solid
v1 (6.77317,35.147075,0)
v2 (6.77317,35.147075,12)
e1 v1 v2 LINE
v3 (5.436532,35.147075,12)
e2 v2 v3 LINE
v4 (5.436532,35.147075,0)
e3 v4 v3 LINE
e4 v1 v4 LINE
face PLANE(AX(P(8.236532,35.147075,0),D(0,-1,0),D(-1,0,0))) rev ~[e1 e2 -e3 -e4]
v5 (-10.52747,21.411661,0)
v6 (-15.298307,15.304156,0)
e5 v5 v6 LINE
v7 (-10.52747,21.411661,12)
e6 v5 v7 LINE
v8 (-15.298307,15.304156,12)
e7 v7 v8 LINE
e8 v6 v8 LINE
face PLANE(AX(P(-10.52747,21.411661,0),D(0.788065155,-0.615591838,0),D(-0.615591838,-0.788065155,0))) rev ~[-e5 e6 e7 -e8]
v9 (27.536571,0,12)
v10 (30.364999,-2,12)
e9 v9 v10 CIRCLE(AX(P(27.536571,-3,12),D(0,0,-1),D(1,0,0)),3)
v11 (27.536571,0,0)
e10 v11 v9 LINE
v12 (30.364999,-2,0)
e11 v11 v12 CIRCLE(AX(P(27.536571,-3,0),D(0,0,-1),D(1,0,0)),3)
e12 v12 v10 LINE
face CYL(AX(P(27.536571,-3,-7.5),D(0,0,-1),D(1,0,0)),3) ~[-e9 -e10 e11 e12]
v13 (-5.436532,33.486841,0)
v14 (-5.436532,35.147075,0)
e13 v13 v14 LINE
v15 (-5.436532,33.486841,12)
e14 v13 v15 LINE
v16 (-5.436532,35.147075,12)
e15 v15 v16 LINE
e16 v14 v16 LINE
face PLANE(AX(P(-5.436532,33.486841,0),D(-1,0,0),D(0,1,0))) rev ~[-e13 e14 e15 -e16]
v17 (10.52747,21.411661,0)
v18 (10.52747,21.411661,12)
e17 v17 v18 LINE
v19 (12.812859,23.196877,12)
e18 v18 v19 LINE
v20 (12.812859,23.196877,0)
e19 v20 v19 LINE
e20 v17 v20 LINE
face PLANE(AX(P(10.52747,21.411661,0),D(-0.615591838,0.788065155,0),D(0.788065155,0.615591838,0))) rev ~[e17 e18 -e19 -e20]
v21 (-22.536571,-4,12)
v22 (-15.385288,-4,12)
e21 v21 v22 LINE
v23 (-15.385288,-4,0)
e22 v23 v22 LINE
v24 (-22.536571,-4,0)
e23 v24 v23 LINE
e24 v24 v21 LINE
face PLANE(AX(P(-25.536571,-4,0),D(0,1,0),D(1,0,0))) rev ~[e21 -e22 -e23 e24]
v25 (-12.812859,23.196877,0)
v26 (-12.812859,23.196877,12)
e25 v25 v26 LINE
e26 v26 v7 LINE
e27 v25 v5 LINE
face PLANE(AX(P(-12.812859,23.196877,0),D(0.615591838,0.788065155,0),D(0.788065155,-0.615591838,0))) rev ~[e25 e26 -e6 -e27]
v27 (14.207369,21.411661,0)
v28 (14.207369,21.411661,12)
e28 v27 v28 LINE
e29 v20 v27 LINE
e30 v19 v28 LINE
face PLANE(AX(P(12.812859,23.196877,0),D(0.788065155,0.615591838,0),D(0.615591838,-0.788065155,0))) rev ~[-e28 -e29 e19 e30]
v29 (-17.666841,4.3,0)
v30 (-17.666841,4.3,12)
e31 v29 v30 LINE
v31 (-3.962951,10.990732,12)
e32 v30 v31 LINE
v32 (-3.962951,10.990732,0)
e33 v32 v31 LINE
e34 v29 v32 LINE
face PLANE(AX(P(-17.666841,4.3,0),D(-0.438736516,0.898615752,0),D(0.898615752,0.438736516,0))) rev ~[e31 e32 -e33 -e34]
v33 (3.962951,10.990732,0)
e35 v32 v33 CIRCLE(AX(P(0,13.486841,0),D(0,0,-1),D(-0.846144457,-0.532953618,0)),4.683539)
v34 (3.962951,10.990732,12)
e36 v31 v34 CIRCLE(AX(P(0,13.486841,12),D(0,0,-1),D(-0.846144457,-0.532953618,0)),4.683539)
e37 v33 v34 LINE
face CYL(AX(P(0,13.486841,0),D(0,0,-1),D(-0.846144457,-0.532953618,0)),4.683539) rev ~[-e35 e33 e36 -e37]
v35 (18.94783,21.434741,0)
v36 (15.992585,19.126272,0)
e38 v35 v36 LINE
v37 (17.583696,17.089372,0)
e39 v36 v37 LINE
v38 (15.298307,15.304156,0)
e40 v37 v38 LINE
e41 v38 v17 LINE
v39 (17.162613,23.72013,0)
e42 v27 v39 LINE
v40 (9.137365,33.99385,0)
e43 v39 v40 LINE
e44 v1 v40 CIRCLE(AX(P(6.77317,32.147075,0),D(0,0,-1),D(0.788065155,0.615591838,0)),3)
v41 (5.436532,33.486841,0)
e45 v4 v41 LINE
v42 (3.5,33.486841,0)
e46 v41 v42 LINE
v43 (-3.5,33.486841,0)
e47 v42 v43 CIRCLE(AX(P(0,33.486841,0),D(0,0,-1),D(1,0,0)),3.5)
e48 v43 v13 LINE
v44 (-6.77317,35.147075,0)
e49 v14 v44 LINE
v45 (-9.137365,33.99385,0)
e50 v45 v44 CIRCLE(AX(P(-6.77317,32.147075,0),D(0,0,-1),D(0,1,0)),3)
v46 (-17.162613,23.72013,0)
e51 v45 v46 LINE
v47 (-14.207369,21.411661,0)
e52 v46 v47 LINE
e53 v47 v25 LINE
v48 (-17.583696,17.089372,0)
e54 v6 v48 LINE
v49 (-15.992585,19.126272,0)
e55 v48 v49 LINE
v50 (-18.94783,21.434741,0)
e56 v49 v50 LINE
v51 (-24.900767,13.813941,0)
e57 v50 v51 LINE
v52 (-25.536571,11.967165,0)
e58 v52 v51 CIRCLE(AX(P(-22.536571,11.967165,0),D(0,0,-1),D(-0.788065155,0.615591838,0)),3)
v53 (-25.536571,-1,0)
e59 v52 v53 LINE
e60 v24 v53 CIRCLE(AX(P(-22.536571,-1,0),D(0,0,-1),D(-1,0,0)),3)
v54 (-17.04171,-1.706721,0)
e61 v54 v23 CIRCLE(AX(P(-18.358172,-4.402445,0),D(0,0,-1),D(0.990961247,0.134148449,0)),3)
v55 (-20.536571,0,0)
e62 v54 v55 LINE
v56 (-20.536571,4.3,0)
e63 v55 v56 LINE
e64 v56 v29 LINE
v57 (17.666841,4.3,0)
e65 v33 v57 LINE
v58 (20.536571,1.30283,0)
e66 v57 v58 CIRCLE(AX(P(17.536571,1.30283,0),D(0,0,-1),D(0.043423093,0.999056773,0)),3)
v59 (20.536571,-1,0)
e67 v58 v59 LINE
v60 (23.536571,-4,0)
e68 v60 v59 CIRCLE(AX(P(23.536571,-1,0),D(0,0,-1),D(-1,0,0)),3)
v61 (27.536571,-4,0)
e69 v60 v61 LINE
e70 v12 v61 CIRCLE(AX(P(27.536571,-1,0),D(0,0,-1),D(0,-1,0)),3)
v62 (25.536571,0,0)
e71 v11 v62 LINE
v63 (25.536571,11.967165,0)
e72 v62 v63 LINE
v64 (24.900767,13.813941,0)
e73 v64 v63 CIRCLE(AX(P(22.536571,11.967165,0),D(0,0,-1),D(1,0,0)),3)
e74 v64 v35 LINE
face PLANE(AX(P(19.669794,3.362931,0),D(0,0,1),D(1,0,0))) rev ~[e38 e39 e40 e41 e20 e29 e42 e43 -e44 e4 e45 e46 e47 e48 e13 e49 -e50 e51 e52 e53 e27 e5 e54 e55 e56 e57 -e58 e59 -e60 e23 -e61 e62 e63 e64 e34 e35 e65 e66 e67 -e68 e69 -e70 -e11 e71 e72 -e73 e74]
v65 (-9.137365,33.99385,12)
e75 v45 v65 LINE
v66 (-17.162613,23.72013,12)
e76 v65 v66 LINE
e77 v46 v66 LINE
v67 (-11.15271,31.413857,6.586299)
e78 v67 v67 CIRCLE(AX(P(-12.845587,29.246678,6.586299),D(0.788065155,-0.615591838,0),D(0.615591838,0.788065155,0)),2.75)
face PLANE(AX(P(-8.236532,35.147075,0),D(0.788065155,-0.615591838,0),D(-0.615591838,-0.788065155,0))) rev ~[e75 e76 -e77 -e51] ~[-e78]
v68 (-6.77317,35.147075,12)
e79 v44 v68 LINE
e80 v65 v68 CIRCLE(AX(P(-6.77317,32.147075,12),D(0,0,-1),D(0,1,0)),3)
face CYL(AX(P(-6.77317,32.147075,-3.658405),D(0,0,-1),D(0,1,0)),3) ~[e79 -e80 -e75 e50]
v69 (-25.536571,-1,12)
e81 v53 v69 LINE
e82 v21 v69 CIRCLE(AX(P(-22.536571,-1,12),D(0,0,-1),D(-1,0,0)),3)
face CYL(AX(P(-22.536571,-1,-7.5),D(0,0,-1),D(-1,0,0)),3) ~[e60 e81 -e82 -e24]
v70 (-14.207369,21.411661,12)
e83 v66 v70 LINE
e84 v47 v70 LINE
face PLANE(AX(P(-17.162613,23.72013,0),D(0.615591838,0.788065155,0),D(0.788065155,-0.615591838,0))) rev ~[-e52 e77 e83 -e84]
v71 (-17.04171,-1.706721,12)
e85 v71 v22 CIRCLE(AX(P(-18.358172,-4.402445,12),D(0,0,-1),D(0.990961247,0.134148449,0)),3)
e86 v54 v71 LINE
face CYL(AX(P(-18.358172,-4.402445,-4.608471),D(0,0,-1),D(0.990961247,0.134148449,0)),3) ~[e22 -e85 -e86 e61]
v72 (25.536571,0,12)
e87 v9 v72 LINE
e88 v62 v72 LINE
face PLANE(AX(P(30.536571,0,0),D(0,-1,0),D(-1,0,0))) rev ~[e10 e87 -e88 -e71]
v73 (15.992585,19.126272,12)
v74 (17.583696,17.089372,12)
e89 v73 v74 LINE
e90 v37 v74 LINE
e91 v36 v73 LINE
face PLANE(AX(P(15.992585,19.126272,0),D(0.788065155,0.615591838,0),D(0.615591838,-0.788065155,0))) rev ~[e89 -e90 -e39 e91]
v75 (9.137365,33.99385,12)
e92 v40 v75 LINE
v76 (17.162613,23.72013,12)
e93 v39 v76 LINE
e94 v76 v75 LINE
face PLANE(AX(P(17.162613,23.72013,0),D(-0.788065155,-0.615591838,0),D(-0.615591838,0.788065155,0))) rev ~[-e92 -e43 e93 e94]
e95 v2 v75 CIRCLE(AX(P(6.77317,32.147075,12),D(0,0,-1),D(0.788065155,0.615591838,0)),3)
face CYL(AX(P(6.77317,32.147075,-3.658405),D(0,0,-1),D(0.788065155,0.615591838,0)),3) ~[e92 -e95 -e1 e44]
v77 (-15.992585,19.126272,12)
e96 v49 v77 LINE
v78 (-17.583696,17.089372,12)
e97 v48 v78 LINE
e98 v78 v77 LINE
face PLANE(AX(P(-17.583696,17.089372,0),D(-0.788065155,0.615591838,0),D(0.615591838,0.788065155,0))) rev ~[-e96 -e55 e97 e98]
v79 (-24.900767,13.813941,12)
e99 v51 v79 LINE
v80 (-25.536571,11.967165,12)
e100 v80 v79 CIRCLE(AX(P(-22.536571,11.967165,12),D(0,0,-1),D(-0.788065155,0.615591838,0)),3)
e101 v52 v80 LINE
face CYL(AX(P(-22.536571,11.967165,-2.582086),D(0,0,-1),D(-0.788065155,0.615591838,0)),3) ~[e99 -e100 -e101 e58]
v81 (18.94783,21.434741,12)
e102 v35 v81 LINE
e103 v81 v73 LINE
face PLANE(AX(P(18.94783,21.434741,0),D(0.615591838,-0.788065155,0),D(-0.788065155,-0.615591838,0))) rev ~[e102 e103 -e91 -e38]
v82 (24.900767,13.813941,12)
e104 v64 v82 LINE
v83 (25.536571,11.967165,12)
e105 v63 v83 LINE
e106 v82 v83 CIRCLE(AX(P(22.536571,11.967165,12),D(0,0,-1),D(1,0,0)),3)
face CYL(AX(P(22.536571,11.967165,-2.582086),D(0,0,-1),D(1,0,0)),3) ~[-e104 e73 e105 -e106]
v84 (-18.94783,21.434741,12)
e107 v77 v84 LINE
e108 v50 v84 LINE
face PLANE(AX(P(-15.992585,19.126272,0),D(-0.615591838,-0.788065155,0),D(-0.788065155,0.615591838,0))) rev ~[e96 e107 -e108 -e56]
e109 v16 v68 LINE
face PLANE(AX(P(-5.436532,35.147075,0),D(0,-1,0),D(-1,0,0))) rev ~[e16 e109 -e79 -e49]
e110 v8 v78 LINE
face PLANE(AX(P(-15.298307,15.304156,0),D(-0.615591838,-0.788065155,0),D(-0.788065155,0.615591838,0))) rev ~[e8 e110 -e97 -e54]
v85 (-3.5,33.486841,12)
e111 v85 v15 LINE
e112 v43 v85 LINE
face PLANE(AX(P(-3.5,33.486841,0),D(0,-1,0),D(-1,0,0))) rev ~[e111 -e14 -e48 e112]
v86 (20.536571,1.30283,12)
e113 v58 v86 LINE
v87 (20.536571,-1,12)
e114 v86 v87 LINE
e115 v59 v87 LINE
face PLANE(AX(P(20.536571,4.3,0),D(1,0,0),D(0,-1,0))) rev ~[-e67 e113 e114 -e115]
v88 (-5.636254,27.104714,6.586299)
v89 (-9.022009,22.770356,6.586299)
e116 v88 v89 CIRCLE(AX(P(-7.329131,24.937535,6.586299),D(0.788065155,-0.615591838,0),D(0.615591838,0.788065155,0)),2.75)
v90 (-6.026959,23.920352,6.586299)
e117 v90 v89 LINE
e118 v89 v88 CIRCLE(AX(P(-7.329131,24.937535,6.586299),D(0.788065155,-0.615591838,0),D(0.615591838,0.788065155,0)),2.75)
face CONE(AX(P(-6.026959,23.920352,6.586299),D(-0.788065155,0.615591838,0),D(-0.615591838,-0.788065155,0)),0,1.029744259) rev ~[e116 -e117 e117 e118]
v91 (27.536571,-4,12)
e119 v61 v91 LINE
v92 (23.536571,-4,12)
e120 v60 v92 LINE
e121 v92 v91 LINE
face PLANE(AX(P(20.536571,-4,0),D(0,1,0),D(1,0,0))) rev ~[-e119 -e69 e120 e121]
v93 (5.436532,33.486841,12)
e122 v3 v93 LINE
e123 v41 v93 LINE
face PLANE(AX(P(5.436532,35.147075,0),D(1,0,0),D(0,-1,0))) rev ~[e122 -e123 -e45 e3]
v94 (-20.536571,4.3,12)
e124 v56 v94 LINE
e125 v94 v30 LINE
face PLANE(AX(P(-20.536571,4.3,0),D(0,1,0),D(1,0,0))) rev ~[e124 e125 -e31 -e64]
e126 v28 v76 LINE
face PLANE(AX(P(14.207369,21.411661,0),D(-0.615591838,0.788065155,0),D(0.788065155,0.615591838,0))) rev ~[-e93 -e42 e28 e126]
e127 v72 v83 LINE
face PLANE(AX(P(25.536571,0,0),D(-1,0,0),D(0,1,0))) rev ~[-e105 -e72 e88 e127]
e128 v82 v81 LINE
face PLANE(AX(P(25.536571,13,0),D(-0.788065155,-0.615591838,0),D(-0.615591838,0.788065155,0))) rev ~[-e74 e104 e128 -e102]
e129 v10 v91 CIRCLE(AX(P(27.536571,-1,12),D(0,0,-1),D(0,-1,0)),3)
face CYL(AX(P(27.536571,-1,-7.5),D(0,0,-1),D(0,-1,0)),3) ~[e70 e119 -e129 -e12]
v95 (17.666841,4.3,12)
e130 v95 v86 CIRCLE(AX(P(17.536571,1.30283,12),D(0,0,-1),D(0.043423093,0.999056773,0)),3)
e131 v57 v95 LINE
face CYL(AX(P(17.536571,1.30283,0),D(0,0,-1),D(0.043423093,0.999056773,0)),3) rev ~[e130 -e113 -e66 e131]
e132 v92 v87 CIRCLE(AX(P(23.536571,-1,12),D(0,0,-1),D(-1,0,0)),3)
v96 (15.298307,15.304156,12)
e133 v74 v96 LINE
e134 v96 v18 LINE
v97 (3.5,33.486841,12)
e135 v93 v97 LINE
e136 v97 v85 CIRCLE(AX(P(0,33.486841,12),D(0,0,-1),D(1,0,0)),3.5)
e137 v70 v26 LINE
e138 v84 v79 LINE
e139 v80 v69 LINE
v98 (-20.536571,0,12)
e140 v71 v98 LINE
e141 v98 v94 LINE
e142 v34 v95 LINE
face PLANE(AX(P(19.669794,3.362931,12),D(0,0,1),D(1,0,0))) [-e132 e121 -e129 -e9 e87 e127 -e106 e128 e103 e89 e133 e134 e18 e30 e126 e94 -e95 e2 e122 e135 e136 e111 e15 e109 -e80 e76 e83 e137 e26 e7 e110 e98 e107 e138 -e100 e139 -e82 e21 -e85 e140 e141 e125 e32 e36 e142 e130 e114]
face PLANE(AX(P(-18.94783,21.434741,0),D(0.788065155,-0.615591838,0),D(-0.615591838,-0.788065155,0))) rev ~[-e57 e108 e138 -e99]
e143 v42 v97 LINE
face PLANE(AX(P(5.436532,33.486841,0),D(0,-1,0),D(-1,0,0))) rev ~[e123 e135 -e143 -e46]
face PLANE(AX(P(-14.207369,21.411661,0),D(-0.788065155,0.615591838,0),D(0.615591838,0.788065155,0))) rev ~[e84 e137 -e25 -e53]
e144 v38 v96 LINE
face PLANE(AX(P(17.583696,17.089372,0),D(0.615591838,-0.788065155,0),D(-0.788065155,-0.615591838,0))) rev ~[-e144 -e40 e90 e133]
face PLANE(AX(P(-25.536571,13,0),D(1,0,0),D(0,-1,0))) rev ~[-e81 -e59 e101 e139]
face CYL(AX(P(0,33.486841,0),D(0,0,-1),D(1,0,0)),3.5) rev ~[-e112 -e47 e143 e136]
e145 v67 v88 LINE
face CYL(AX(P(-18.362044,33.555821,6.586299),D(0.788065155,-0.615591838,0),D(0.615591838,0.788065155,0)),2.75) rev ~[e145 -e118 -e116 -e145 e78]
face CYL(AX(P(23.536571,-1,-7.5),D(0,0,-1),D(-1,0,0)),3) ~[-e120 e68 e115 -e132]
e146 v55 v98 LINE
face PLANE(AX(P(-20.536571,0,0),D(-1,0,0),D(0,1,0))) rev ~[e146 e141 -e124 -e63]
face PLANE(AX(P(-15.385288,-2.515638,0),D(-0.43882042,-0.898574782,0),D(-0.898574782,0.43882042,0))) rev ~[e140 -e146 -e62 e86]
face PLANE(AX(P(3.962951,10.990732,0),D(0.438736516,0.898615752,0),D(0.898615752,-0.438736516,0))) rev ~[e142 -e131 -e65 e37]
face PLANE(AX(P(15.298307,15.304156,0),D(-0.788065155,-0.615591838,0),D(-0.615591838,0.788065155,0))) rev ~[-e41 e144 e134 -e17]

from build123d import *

# Parameters (mm, degrees)
F1_DEPTH    = 12
F3_D        = 5.5
F3_DEPTH    = 7
F3_TIP      = 1.6523667023
F4_T1_DEPTH = 12
F4_T3_DEPTH = 27
F4_T5_DEPTH = 17.1641728771
F4_T7_DEPTH = 19.3168092608
F4_T9_DEPTH = 21.2169428411


# Not quite as in the source:
# - a fillet or chamfer that OpenCascade refuses, or shapes differently, is made with other operations: its cross-section is extruded or revolved along the edge and cut away or added
# - a feature names something its author has since deleted; it is built from what else it names


with BuildPart() as f1:
    # F0 (on Top) → F1 (new body)
    with BuildSketch(Plane.XY):
        with BuildLine():
            Line((5.4365318258, 35.1470746964), (5.4365318258, 33.4868409083))
            Line((5.4365318258, 33.4868409083), (3.5, 33.4868409083))
            ThreePointArc((3.5, 33.4868409083), (0, 29.9868409083), (-3.5, 33.4868409083))
            Line((-3.5, 33.4868409083), (-5.4365318258, 33.4868409083))
            Line((-5.4365318258, 33.4868409083), (-5.4365318258, 35.1470746964))
            Line((-5.4365318258, 35.1470746964), (-8.2365318258, 35.1470746964))
            Line((-8.2365318258, 35.1470746964), (-17.1626134825, 23.7201299491))
            Line((-17.1626134825, 23.7201299491), (-14.2073691514, 21.4116605551))
            Line((-14.2073691514, 21.4116605551), (-12.8128593238, 23.1968768865))
            Line((-12.8128593238, 23.1968768865), (-10.5274703744, 21.4116605551))
            Line((-10.5274703744, 21.4116605551), (-15.298307122, 15.304155604))
            Line((-15.298307122, 15.304155604), (-17.5836960714, 17.0893719354))
            Line((-17.5836960714, 17.0893719354), (-15.9925854827, 19.1262716057))
            Line((-15.9925854827, 19.1262716057), (-18.9478298139, 21.4347409997))
            Line((-18.9478298139, 21.4347409997), (-25.5365714751, 13))
            Line((-25.5365714751, 13), (-25.5365714751, 0))
            Line((-25.5365714751, 0), (-25.5365714751, -4))
            Line((-25.5365714751, -4), (-20.5365714751, -4))
            Line((-20.5365714751, -4), (-15.3852878138, -4))
            Line((-15.3852878138, -4), (-15.3852878138, -2.5156375486))
            Line((-15.3852878138, -2.5156375486), (-20.5365714751, 0))
            Line((-20.5365714751, 0), (-20.5365714751, 4.3))
            Line((-20.5365714751, 4.3), (-17.6668407531, 4.3))
            Line((-17.6668407531, 4.3), (-3.9629505379, 10.990731871))
            ThreePointArc((-3.9629505379, 10.990731871), (0, 18.1703798791), (3.9629505379, 10.990731871))
            Line((3.9629505379, 10.990731871), (17.6668407531, 4.3))
            Line((17.6668407531, 4.3), (20.5365714751, 4.3))
            Line((20.5365714751, 4.3), (20.5365714751, -4))
            Line((20.5365714751, -4), (30.5365714751, -4))
            Line((30.5365714751, -4), (30.5365714751, 0))
            Line((30.5365714751, 0), (25.5365714751, 0))
            Line((25.5365714751, 0), (25.5365714751, 13))
            Line((25.5365714751, 13), (18.9478298139, 21.4347409997))
            Line((18.9478298139, 21.4347409997), (15.9925854827, 19.1262716057))
            Line((15.9925854827, 19.1262716057), (17.5836960714, 17.0893719354))
            Line((17.5836960714, 17.0893719354), (15.298307122, 15.304155604))
            Line((15.298307122, 15.304155604), (10.5274703744, 21.4116605551))
            Line((10.5274703744, 21.4116605551), (12.8128593238, 23.1968768865))
            Line((12.8128593238, 23.1968768865), (14.2073691514, 21.4116605551))
            Line((14.2073691514, 21.4116605551), (17.1626134825, 23.7201299491))
            Line((17.1626134825, 23.7201299491), (8.2365318258, 35.1470746964))
            Line((8.2365318258, 35.1470746964), (5.4365318258, 35.1470746964))
        make_face()
    extrude(amount=F1_DEPTH)

    # F3
    with Locations(Plane(origin=(-22.1660473582, 17.3148600175, 0), x_dir=(-0.6155918384, -0.788065155, 0), z_dir=(-0.788065155, 0.6155918384, 0))):
        with Locations((-15.1406489313, 6.5862988122)):
            Hole(F3_D / 2, depth=F3_DEPTH)
            with Locations((0, 0, -(F3_DEPTH + F3_TIP / 2))):  # 118° drill point
                Cone(0, F3_D / 2, F3_TIP, mode=Mode.SUBTRACT)

    # F4: fillet of radius 3 on 10 edges, made by hand

    # F4_s2 → F4_t1 (join)
    with BuildSketch(Plane.XY):
        with BuildLine():
            ThreePointArc((17.6668407531, 4.3), (19.7034595472, 3.3775817354), (20.5365714751, 1.302829682))
            Line((20.5365714751, 1.302829682), (20.5365714751, 4.3))
            Line((20.5365714751, 4.3), (17.6668407531, 4.3))
        make_face()
    extrude(amount=F4_T1_DEPTH)

    # F4_s4 → F4_t3 (cut)
    with BuildSketch(Plane.XY.offset(-7.5)):
        with BuildLine():
            ThreePointArc((20.5365714751, -1), (21.4152511315, -3.1213203436), (23.5365714751, -4))
            Line((23.5365714751, -4), (20.5365714751, -4))
            Line((20.5365714751, -4), (20.5365714751, -1))
        make_face()
        with BuildLine():
            ThreePointArc((-25.5365714751, -1), (-24.6578918186, -3.1213203436), (-22.5365714751, -4))
            Line((-22.5365714751, -4), (-25.5365714751, -4))
            Line((-25.5365714751, -4), (-25.5365714751, -1))
        make_face()
        with BuildLine():
            ThreePointArc((30.5365714751, -3), (29.6578918186, -0.8786796564), (27.5365714751, 0))
            Line((27.5365714751, 0), (30.5365714751, 0))
            Line((30.5365714751, 0), (30.5365714751, -3))
        make_face()
        with BuildLine():
            ThreePointArc((27.5365714751, -4), (29.6578918186, -3.1213203436), (30.5365714751, -1))
            Line((30.5365714751, -1), (30.5365714751, -4))
            Line((30.5365714751, -4), (27.5365714751, -4))
        make_face()
    extrude(amount=F4_T3_DEPTH, mode=Mode.SUBTRACT)

    # F4_s6 → F4_t5 (cut)
    with BuildSketch(Plane.XY.offset(-2.5820864386)):
        with BuildLine():
            ThreePointArc((25.5365714751, 11.9671654246), (25.3731703536, 12.9437445573), (24.90076694, 13.8139409398))
            Line((24.90076694, 13.8139409398), (25.5365714751, 13))
            Line((25.5365714751, 13), (25.5365714751, 11.9671654246))
        make_face()
        with BuildLine():
            ThreePointArc((-24.90076694, 13.8139409398), (-25.3731703536, 12.9437445573), (-25.5365714751, 11.9671654246))
            Line((-25.5365714751, 11.9671654246), (-25.5365714751, 13))
            Line((-25.5365714751, 13), (-24.90076694, 13.8139409398))
        make_face()
    extrude(amount=F4_T5_DEPTH, mode=Mode.SUBTRACT)

    # F4_s8 → F4_t7 (cut)
    with BuildSketch(Plane.XY.offset(-3.6584046304)):
        with BuildLine():
            ThreePointArc((9.1373654386, 33.9938502116), (8.088402549, 34.843398726), (6.7731699737, 35.1470746964))
            Line((6.7731699737, 35.1470746964), (8.2365318258, 35.1470746964))
            Line((8.2365318258, 35.1470746964), (9.1373654386, 33.9938502116))
        make_face()
        with BuildLine():
            ThreePointArc((-6.7731699737, 35.1470746964), (-8.088402549, 34.843398726), (-9.1373654386, 33.9938502116))
            Line((-9.1373654386, 33.9938502116), (-8.2365318258, 35.1470746964))
            Line((-8.2365318258, 35.1470746964), (-6.7731699737, 35.1470746964))
        make_face()
    extrude(amount=F4_T7_DEPTH, mode=Mode.SUBTRACT)

    # F4_s10 → F4_t9 (cut)
    with BuildSketch(Plane.XY.offset(-4.6084714206)):
        with BuildLine():
            ThreePointArc((-15.3852878138, -4), (-15.9262171402, -2.6458583956), (-17.0417102945, -1.7067210022))
            Line((-17.0417102945, -1.7067210022), (-15.3852878138, -2.5156375486))
            Line((-15.3852878138, -2.5156375486), (-15.3852878138, -4))
        make_face()
    extrude(amount=F4_T9_DEPTH, mode=Mode.SUBTRACT)


solid = f1.part
